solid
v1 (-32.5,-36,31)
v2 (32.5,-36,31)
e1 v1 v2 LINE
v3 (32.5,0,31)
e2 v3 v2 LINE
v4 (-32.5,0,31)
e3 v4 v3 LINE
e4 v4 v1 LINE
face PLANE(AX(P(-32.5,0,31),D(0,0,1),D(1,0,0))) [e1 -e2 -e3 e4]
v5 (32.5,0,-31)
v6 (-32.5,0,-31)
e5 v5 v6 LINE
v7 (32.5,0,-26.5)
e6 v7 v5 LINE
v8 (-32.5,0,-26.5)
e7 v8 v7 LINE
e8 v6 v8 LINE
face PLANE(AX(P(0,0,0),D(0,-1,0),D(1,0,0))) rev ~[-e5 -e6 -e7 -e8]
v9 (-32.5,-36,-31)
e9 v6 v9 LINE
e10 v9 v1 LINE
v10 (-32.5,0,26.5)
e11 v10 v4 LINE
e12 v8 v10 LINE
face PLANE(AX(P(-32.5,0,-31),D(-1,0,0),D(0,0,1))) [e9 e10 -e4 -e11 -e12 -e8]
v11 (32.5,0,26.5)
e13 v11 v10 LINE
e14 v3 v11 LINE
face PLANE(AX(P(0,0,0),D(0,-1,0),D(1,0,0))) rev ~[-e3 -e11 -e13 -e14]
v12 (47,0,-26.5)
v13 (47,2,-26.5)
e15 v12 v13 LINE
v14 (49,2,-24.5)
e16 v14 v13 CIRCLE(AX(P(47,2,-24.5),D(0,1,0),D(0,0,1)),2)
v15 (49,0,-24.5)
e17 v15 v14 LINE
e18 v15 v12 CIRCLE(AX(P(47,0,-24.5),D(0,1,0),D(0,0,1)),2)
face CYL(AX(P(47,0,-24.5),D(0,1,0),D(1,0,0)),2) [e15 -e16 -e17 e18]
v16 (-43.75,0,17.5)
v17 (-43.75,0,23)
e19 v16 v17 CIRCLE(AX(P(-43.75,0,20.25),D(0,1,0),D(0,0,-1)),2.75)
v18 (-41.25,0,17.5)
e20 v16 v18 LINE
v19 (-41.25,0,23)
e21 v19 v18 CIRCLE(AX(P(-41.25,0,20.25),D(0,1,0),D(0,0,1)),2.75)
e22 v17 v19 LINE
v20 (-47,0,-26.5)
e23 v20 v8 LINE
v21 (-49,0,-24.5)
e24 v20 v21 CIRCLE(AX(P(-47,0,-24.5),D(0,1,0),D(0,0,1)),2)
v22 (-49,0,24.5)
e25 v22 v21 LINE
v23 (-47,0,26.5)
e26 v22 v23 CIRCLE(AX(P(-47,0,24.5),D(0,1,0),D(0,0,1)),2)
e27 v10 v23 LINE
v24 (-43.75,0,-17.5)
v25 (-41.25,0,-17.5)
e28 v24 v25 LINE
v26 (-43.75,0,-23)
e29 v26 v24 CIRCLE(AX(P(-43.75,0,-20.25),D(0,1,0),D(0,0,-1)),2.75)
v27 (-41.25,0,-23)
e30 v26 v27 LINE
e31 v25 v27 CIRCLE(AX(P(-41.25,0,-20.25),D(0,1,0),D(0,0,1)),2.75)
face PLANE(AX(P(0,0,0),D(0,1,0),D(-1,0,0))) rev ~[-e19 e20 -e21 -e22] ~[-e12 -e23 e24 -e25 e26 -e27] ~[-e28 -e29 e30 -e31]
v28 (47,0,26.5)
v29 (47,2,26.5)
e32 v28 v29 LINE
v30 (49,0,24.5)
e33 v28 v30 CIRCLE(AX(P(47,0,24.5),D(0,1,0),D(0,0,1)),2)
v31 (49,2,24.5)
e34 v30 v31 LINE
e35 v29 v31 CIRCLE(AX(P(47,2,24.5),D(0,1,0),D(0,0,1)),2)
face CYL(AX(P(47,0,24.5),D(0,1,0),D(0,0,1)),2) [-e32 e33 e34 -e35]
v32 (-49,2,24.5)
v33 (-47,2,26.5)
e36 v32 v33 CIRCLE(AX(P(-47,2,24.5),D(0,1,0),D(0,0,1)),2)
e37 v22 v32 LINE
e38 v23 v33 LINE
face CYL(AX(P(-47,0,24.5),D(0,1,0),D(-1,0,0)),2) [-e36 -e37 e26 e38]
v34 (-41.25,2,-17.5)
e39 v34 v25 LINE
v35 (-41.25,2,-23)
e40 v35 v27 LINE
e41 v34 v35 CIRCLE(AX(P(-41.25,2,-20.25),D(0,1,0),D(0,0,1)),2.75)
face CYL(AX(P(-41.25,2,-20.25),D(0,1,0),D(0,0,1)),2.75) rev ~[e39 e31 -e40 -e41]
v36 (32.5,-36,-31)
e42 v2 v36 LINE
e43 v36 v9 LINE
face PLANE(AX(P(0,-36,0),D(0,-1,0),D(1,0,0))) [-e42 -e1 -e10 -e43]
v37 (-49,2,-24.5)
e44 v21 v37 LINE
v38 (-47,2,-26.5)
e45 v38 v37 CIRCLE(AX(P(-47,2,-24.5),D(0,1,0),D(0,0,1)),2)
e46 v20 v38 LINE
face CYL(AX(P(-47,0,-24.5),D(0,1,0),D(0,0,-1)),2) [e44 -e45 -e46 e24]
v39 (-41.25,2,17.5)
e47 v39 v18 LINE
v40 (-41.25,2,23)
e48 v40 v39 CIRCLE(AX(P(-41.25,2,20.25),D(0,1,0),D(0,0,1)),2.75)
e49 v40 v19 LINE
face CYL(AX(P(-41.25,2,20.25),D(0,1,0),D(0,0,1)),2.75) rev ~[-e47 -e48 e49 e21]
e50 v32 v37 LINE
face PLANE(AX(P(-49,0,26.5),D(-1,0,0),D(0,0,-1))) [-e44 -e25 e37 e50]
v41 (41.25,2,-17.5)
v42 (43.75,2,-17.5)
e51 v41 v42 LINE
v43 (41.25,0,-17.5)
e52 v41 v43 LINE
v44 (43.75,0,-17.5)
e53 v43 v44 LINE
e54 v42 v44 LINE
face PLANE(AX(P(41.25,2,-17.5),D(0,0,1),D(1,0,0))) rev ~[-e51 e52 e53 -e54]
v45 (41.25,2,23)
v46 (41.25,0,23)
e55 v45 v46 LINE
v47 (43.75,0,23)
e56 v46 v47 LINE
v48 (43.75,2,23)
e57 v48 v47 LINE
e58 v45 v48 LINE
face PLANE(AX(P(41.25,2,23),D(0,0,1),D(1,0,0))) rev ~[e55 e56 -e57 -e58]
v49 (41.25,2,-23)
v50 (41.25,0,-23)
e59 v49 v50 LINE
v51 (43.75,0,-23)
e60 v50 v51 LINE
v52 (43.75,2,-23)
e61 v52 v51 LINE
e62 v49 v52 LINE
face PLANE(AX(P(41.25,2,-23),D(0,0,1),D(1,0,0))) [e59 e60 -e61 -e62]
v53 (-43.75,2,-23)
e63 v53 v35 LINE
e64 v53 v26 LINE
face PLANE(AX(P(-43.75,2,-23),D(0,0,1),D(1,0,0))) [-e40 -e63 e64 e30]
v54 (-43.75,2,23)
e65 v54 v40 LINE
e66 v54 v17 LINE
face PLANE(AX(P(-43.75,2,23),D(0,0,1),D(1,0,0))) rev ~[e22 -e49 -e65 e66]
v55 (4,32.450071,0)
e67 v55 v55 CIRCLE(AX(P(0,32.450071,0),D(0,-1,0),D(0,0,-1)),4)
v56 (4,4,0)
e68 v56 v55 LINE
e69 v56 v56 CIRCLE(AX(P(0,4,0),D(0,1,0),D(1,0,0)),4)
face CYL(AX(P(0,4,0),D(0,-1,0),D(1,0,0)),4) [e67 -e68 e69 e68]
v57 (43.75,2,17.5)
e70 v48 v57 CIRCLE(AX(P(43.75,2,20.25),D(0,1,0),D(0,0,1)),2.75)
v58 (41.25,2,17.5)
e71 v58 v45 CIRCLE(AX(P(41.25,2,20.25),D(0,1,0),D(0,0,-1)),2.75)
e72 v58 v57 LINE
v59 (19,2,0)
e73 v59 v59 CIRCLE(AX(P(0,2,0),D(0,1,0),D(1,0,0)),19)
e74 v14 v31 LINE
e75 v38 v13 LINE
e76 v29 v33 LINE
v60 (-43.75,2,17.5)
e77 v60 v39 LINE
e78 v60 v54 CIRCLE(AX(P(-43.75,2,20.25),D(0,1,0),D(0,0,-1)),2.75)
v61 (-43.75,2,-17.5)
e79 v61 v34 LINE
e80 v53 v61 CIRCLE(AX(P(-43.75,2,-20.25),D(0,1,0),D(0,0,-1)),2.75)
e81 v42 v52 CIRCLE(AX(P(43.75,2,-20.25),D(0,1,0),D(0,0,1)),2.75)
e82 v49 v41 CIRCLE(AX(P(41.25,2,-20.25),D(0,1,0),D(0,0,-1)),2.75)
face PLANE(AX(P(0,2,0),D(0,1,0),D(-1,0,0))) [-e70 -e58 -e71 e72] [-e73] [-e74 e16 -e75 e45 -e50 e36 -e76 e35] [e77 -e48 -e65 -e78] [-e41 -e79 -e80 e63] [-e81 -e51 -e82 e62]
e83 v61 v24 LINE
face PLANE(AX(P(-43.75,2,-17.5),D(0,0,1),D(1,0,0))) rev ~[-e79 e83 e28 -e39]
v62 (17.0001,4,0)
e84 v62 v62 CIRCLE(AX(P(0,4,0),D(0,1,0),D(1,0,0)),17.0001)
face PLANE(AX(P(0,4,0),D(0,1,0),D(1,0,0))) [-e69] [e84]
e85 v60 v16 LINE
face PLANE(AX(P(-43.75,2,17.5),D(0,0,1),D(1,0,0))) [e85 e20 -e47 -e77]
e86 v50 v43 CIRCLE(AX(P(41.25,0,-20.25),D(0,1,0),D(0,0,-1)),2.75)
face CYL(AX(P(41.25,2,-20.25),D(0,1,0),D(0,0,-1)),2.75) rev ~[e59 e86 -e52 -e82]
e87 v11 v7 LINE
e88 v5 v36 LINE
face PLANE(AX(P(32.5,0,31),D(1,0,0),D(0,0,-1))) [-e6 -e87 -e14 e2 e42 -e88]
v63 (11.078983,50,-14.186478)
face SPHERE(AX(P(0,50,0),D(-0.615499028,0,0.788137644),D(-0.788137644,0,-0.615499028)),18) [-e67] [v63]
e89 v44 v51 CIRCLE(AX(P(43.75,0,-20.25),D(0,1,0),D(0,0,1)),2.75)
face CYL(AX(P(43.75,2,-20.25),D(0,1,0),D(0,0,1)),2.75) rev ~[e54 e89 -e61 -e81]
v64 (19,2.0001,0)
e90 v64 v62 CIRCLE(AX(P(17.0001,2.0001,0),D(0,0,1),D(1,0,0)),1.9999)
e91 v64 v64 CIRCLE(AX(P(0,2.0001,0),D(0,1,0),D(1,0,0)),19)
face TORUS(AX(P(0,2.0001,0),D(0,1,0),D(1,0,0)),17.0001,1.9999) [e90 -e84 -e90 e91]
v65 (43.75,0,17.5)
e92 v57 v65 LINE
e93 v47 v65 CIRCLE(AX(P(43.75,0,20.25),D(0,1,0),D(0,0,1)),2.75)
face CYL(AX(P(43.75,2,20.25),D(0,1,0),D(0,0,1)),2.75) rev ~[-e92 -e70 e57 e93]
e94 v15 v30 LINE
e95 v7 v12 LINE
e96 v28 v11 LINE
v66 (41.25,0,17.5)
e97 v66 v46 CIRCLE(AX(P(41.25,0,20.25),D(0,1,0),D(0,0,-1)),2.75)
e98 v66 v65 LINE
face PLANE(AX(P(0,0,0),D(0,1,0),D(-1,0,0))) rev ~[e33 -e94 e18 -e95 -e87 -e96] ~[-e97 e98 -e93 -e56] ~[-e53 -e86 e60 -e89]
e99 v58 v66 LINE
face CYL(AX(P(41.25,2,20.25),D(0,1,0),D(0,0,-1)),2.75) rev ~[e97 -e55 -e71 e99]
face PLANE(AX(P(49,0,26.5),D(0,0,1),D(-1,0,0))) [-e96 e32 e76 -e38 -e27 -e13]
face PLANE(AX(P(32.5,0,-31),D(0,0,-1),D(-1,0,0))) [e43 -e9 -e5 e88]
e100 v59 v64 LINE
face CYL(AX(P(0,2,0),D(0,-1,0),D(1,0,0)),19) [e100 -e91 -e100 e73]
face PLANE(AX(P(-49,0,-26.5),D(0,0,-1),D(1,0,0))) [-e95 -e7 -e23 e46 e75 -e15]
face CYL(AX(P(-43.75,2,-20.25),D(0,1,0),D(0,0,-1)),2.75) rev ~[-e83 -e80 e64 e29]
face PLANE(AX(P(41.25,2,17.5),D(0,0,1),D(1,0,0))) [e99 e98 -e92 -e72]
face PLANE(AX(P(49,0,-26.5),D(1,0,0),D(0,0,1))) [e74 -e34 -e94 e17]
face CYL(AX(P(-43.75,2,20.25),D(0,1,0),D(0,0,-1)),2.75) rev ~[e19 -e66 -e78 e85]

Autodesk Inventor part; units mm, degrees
ref_plane "YZ Plane" through (0, 0, 0) normal (1, 0, 0) x (0, 1, 0)
ref_plane "XZ Plane" through (0, 0, 0) normal (0, 1, 0) x (-1, 0, 0)
ref_plane "XY Plane" through (0, 0, 0) normal (0, 0, 1) x (1, 0, 0)
sketch "Sketch2" plane through (0, 0, 0) normal (0, 1, 0) x (-1, 0, 0)
  line L0 (-49, 26.5) -> (49, 26.5)
  line L1 (49, 26.5) -> (49, -26.5)
  line L2 (49, -26.5) -> (-49, -26.5)
  line L3 (-49, -26.5) -> (-49, 26.5)
  point P0 (0, 0)
  point P1 (0, -26.5)
  point P2 (49, 0)
  dimension "d5" = 98
  dimension "d7" = 53
extrude "Extrusion1" add sketch "Sketch2" along normal blind 2
sketch "Sketch3" plane through (0, 2, 0) normal (0, 1, 0) x (1, 0, 0)
  line L0 (-49, -26.5) -> (49, -26.5) projected
  line L1 (49, -26.5) -> (49, 26.5) projected
  line L2 (49, 26.5) -> (-49, 26.5) projected
  line L3 (-49, 26.5) -> (-49, -26.5) projected
  arc A0 (43.75, 17.5) -> (43.75, 23) centre (43.75, 20.25) ccw
  arc A1 (41.25, 23) -> (41.25, 17.5) centre (41.25, 20.25) ccw
  line L4 (41.25, 23) -> (43.75, 23)
  line L5 (41.25, 17.5) -> (43.75, 17.5)
  arc A2 (-41.25, 17.5) -> (-41.25, 23) centre (-41.25, 20.25) ccw
  arc A3 (-43.75, 23) -> (-43.75, 17.5) centre (-43.75, 20.25) ccw
  line L6 (-43.75, 23) -> (-41.25, 23)
  line L7 (-43.75, 17.5) -> (-41.25, 17.5)
  arc A4 (43.75, -23) -> (43.75, -17.5) centre (43.75, -20.25) ccw
  arc A5 (41.25, -17.5) -> (41.25, -23) centre (41.25, -20.25) ccw
  line L8 (41.25, -17.5) -> (43.75, -17.5)
  line L9 (41.25, -23) -> (43.75, -23)
  arc A6 (-41.25, -23) -> (-41.25, -17.5) centre (-41.25, -20.25) ccw
  arc A7 (-43.75, -17.5) -> (-43.75, -23) centre (-43.75, -20.25) ccw
  line L10 (-43.75, -17.5) -> (-41.25, -17.5)
  line L11 (-43.75, -23) -> (-41.25, -23)
  point P0 (0, 0)
  dimension "d10" = 5.5
  dimension "d13" = 2.5
  dimension "d14" = 20.25
  dimension "d15" = 41.25
  dimension "d20" = 85
  dimension "d23" = 40.5
extrude "Extrusion4" cut sketch "Sketch3" against normal blind 2 keep common part
sketch "Sketch4" plane through (0, 2, 0) normal (0, 1, 0) x (1, 0, 0)
  circle A0 centre (0, 0) radius 19
  dimension "d30" = 38
extrude "Extrusion5" add sketch "Sketch4" along normal blind 2
sketch "Sketch5" plane through (0, 4, 0) normal (0, 1, 0) x (1, 0, 0)
  circle A0 centre (0, 0) radius 19 projected
  circle A1 centre (0, 0) radius 4
  dimension "d34" = 8
extrude "Extrusion6" add sketch "Sketch5" along normal blind 46 contours A1
sketch "Sketch6" plane through (0, 0, 0) normal (0, -1, 0) x (1, 0, 0)
  line L0 (-32.5, 31) -> (32.5, 31)
  line L1 (32.5, 31) -> (32.5, -31)
  line L2 (32.5, -31) -> (-32.5, -31)
  line L3 (-32.5, -31) -> (-32.5, 31)
  point P0 (0, 0)
  point P1 (0, 31)
  point P2 (-32.5, 0)
  dimension "d39" = 65
  dimension "d42" = 62
extrude "Extrusion7" add sketch "Sketch6" along normal blind 36
sketch "Sketch7" plane through (0, 50, 0) normal (0, 1, 0) x (1, 0, 0)
  circle A0 centre (0, 0) radius 4 projected
  circle A1 centre (0, 0) radius 18
  line L0 (11.079, 14.1865) -> (-11.079, -14.1865)
  dimension "d46" = 36
revolve "Revolution1" add sketch "Sketch7" angle 360 about axis through (11.079, 50, -14.1865) along (-0.6154984, 0, 0.7881381) picked at (-1.4546, 2.0706) picked at (6.9677, 11.2549) contours L0 A0 | A0 L0 A1
fillet "Fillet1" radius 2 1 edges at (49, 1, 26.5)
fillet "Fillet2" radius 2 1 edges at (49, 1, -26.5)
fillet "Fillet3" radius 2 1 edges at (-49, 1, -26.5)
fillet "Fillet4" radius 2 1 edges at (-49, 1, 26.5)
fillet "Fillet5" radius 2 1 edges at (-19, 4, 0)
equation "\"BendRadius\" = Thickness"
equation "\"BendReliefWidth\" = Thickness"
equation "\"BendReliefDepth\" = 0.5 * Thickness"
equation "\"CornerReliefSize\" = 4 * Thickness"
equation "\"MinimumRemnant\" = 2 * Thickness"
equation "\"TransitionRadius\" = BendRadius"
equation "\"JacobiRadiusSize\" = Thickness"
equation "\"GapSize\" = Thickness"
equation "\"Thickness\" = 0.5"
properties part number "Sanwa_Joystick_JLF-TP-8YT"
